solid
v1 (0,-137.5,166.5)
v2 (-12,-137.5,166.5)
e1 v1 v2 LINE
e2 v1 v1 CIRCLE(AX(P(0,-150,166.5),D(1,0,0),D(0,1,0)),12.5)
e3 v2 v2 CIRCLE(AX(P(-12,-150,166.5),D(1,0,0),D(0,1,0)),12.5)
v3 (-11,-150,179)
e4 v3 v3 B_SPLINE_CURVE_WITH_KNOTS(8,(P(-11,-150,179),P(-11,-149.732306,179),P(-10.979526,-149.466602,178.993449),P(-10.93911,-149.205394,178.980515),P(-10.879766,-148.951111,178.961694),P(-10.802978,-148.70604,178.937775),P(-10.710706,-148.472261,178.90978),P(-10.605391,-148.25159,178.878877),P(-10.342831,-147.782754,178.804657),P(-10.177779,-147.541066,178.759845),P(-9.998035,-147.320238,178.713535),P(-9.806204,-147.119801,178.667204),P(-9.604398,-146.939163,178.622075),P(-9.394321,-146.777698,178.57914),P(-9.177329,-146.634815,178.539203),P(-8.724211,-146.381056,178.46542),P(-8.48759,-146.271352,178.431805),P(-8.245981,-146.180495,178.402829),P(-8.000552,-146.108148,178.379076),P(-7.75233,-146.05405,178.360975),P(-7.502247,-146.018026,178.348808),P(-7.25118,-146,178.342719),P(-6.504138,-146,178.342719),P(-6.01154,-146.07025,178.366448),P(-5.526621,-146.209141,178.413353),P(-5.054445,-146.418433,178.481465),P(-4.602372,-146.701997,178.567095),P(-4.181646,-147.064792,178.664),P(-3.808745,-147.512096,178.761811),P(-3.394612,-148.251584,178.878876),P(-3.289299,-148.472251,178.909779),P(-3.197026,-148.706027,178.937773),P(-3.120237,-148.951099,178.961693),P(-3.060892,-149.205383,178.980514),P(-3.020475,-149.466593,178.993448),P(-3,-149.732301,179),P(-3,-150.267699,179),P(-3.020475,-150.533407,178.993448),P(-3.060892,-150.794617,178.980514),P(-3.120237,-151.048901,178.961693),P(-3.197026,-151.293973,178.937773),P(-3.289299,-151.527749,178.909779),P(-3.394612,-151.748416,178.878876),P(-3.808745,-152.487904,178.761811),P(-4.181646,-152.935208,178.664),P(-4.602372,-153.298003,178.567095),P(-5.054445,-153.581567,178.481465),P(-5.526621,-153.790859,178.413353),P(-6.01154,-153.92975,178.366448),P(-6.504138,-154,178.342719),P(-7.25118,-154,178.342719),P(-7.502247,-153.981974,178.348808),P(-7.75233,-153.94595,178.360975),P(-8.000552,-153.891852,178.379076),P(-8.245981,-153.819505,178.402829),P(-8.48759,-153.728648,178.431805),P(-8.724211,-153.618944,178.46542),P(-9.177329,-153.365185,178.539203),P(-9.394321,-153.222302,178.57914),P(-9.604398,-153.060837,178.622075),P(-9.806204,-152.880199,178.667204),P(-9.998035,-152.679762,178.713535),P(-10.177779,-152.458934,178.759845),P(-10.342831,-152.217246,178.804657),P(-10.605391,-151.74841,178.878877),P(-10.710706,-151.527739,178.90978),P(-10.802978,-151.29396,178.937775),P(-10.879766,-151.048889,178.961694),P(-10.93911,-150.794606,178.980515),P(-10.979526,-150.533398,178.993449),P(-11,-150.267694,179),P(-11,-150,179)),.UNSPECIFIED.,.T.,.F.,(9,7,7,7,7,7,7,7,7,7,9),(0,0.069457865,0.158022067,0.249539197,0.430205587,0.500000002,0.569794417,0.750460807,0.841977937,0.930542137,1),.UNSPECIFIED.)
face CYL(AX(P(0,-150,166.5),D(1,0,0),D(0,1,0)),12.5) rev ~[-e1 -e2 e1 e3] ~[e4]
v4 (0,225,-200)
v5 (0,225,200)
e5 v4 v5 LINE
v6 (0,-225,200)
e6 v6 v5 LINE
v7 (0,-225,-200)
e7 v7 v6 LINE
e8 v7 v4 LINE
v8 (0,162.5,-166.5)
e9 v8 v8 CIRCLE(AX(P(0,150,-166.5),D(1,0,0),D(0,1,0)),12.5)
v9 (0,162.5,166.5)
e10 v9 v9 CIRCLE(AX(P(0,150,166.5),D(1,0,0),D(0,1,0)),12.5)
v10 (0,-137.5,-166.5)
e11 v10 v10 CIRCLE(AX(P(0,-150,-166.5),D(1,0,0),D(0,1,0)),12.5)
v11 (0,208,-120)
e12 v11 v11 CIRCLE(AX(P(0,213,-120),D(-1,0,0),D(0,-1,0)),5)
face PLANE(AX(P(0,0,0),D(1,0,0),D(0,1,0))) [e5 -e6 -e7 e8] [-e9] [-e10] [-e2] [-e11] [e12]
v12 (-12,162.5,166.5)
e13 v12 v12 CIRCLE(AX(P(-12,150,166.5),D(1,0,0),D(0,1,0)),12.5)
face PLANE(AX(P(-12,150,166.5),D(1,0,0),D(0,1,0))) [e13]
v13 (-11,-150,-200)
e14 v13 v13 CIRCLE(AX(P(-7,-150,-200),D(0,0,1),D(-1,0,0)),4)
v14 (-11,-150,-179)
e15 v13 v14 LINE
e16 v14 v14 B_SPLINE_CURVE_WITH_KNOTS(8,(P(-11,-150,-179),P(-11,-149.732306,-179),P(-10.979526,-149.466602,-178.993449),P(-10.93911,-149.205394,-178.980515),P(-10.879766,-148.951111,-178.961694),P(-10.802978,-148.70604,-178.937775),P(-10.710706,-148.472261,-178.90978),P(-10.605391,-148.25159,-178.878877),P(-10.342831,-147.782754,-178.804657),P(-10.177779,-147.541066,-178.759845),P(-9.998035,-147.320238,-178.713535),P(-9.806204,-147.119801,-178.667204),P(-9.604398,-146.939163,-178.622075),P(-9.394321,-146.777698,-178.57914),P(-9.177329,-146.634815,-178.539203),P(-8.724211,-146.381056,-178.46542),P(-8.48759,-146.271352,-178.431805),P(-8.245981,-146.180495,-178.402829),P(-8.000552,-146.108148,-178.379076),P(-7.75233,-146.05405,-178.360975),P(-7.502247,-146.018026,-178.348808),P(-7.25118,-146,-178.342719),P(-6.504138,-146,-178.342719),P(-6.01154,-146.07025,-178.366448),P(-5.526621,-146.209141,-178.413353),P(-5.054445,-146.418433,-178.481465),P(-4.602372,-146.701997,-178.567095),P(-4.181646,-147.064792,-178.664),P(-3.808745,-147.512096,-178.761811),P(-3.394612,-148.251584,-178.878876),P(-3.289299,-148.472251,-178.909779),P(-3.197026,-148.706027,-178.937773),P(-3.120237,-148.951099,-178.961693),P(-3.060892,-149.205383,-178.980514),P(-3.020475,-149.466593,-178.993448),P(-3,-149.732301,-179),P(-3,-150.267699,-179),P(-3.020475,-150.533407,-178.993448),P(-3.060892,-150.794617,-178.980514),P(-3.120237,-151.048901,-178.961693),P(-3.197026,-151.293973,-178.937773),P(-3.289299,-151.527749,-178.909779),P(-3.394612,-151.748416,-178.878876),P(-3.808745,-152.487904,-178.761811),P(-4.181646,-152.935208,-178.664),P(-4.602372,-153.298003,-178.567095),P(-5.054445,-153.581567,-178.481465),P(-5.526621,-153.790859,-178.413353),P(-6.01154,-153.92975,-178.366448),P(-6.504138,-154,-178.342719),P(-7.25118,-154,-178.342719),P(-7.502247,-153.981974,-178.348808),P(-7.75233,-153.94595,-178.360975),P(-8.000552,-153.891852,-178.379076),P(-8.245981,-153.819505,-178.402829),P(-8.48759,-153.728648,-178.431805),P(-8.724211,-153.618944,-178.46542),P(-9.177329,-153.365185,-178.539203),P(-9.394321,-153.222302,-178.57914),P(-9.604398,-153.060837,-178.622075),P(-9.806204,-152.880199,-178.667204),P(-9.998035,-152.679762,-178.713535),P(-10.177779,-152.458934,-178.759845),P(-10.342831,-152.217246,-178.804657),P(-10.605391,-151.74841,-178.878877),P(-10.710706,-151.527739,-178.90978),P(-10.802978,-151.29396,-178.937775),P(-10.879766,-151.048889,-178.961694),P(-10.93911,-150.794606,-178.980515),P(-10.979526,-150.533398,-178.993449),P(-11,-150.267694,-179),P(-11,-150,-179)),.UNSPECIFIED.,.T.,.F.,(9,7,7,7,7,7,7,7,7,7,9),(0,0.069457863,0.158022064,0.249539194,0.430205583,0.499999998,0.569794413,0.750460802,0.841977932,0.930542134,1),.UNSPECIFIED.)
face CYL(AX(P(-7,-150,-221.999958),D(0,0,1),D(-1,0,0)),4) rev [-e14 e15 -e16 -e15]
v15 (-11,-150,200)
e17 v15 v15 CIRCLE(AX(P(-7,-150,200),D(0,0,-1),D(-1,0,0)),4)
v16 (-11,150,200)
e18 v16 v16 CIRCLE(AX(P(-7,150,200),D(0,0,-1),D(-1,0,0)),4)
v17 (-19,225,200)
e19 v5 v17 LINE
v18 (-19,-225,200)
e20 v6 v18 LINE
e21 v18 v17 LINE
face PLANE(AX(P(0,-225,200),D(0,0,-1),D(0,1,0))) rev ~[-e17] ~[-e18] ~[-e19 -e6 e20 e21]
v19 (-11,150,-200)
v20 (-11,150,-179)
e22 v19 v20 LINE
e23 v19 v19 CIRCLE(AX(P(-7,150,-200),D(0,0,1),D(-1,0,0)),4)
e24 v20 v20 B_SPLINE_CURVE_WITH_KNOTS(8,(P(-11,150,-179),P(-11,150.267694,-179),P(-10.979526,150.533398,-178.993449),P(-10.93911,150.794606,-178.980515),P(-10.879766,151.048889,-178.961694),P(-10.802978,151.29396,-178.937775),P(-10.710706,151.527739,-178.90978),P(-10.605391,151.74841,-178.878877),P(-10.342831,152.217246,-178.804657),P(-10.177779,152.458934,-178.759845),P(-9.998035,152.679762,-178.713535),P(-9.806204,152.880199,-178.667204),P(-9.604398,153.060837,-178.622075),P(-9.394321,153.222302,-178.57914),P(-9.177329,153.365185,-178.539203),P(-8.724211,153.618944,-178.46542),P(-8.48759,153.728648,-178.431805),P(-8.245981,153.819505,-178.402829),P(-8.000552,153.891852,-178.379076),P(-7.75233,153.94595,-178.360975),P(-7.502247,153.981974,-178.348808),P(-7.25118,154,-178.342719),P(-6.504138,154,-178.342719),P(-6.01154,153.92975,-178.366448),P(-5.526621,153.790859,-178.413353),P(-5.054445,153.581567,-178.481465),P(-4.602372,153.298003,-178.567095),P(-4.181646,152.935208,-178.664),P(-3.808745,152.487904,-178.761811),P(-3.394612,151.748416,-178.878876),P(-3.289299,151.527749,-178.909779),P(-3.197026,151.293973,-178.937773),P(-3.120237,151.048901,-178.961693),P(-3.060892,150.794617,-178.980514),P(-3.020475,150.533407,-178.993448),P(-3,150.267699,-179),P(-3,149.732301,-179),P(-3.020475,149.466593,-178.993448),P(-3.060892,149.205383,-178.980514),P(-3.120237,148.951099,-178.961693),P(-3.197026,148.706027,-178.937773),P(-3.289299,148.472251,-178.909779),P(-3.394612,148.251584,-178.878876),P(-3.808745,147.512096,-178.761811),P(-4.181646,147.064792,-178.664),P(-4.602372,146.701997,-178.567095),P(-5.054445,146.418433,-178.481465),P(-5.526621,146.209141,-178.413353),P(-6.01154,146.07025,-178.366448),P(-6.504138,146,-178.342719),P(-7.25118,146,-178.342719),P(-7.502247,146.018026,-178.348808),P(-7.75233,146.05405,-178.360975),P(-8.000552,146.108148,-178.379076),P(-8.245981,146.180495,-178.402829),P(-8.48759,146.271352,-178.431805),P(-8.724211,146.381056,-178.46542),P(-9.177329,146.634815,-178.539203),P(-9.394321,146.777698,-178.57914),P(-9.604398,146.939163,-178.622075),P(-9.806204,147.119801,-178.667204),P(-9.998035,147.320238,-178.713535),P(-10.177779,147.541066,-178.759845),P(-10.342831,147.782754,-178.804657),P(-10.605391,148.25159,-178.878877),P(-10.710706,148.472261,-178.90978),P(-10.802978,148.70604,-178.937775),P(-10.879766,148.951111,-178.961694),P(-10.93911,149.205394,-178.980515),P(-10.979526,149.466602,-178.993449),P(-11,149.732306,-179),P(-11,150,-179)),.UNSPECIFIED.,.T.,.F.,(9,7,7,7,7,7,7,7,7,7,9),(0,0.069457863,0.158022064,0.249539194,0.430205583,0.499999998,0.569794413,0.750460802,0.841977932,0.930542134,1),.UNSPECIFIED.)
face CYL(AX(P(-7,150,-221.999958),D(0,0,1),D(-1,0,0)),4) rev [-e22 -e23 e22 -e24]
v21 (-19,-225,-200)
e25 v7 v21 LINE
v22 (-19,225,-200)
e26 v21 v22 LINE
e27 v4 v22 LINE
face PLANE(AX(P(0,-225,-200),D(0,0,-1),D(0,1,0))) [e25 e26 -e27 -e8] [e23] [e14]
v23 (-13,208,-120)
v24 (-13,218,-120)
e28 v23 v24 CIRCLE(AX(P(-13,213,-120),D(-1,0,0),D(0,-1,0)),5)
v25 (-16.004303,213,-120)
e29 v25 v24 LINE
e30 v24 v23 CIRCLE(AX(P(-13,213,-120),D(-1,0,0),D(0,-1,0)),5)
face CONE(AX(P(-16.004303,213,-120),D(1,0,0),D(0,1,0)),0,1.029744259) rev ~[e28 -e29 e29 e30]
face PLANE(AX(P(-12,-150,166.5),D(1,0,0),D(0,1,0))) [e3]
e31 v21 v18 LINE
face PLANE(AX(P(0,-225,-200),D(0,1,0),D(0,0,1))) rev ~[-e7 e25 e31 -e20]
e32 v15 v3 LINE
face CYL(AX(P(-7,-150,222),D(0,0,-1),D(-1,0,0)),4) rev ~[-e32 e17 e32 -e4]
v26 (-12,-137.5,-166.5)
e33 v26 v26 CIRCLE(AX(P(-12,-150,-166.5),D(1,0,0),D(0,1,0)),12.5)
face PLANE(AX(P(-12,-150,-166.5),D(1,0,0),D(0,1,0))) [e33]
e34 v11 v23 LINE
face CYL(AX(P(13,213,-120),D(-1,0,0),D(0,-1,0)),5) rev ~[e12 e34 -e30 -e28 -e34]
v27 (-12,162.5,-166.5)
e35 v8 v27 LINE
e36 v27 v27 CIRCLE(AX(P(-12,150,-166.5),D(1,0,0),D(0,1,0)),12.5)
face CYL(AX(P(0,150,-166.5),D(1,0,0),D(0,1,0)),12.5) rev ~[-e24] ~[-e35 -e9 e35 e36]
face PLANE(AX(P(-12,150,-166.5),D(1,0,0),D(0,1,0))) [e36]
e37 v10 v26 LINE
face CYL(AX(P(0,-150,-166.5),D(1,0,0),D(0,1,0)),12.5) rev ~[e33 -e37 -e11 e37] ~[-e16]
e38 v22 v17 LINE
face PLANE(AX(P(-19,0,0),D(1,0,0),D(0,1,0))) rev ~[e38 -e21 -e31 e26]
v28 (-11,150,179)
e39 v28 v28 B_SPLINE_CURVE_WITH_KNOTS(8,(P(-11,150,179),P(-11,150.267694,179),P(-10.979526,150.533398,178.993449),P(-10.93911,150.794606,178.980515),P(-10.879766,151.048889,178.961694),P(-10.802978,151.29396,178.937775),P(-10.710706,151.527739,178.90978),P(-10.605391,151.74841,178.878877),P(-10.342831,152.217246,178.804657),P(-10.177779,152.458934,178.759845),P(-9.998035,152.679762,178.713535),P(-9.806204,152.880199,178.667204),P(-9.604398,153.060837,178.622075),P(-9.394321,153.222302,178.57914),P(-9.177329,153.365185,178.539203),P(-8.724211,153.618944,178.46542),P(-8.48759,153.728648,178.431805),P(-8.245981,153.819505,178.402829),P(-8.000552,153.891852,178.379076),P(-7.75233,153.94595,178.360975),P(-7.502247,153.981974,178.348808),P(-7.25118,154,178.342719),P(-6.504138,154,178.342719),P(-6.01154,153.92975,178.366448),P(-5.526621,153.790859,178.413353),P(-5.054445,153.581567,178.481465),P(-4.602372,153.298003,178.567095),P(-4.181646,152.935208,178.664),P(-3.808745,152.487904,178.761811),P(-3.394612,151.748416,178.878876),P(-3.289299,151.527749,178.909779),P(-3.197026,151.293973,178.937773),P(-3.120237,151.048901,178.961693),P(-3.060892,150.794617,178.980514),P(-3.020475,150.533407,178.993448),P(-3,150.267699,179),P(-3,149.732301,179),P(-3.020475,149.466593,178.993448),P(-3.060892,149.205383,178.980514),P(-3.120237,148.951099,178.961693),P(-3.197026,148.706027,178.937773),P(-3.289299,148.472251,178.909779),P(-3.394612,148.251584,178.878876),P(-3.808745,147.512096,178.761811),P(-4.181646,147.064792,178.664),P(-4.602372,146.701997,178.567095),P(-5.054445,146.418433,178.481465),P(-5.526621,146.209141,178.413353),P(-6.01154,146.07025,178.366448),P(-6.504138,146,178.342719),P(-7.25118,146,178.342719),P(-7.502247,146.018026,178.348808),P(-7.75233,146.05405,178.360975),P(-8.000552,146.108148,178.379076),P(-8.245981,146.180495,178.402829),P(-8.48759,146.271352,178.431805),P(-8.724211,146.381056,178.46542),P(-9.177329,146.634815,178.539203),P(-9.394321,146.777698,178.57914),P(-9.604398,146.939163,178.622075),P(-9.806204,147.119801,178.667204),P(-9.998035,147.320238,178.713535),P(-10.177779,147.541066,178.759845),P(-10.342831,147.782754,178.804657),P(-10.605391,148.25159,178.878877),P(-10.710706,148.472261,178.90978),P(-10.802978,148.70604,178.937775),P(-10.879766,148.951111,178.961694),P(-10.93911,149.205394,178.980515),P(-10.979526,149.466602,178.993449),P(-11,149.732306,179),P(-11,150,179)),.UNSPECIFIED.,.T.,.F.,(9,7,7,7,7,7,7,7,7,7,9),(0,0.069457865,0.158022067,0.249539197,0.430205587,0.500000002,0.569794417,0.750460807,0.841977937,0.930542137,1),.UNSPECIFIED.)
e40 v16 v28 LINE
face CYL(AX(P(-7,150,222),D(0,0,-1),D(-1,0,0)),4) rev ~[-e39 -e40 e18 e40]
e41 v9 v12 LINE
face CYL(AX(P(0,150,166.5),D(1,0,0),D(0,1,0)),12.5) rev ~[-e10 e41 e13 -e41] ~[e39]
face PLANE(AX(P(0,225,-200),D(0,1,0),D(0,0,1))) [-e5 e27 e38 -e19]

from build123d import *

# Parameters (mm, degrees)
F0_W     = 450
F0_H     = 400
F1_DEPTH = 19
F2_R     = 12.5
F3_DEPTH = 12
F5_D     = 8
F5_DEPTH = 22
F5_TIP   = 2.4034424761
F7_D     = 10
F7_DEPTH = 13
F7_TIP   = 3.0043030951


# Not quite as in the source:
# - a pattern or mirror of a feature is missing from the dataset's text; its kind, count and spacing are read off the source's solid


with BuildPart() as f1:
    # F0 (on Right) → F1 (new body)
    with BuildSketch(Plane.YZ):
        Rectangle(F0_W, F0_H)
    extrude(amount=-F1_DEPTH)

    # F2 (on face) → F3 (cut)
    with BuildSketch(Plane.YZ):
        with Locations((-150, -166.5)):
            Circle(F2_R)
        with Locations((150, -166.5)):
            Circle(F2_R)
        with Locations((-150, 166.5)):
            Circle(F2_R)
        with Locations((150, 166.5)):
            Circle(F2_R)
    extrude(amount=-F3_DEPTH, mode=Mode.SUBTRACT)

    # F5
    with Locations(Plane.XY.offset(200)):
        with Locations((-7, 150), (-7, -150)):
            f5 = Hole(F5_D / 2, depth=F5_DEPTH)
            with Locations((0, 0, -(F5_DEPTH + F5_TIP / 2))):  # 118° drill point
                Cone(0, F5_D / 2, F5_TIP, mode=Mode.SUBTRACT)

    # F5_copies: F5 across plane
    add(f5.mirror(Plane(origin=(0, 0, 2.1e-05), x_dir=(-1, 0, 0), z_dir=(0, 0, -1))), mode=Mode.SUBTRACT)

    # F7
    with Locations(Plane.YZ):
        with Locations((213, -120)):
            Hole(F7_D / 2, depth=F7_DEPTH)
            with Locations((0, 0, -(F7_DEPTH + F7_TIP / 2))):  # 118° drill point
                Cone(0, F7_D / 2, F7_TIP, mode=Mode.SUBTRACT)


solid = f1.part
